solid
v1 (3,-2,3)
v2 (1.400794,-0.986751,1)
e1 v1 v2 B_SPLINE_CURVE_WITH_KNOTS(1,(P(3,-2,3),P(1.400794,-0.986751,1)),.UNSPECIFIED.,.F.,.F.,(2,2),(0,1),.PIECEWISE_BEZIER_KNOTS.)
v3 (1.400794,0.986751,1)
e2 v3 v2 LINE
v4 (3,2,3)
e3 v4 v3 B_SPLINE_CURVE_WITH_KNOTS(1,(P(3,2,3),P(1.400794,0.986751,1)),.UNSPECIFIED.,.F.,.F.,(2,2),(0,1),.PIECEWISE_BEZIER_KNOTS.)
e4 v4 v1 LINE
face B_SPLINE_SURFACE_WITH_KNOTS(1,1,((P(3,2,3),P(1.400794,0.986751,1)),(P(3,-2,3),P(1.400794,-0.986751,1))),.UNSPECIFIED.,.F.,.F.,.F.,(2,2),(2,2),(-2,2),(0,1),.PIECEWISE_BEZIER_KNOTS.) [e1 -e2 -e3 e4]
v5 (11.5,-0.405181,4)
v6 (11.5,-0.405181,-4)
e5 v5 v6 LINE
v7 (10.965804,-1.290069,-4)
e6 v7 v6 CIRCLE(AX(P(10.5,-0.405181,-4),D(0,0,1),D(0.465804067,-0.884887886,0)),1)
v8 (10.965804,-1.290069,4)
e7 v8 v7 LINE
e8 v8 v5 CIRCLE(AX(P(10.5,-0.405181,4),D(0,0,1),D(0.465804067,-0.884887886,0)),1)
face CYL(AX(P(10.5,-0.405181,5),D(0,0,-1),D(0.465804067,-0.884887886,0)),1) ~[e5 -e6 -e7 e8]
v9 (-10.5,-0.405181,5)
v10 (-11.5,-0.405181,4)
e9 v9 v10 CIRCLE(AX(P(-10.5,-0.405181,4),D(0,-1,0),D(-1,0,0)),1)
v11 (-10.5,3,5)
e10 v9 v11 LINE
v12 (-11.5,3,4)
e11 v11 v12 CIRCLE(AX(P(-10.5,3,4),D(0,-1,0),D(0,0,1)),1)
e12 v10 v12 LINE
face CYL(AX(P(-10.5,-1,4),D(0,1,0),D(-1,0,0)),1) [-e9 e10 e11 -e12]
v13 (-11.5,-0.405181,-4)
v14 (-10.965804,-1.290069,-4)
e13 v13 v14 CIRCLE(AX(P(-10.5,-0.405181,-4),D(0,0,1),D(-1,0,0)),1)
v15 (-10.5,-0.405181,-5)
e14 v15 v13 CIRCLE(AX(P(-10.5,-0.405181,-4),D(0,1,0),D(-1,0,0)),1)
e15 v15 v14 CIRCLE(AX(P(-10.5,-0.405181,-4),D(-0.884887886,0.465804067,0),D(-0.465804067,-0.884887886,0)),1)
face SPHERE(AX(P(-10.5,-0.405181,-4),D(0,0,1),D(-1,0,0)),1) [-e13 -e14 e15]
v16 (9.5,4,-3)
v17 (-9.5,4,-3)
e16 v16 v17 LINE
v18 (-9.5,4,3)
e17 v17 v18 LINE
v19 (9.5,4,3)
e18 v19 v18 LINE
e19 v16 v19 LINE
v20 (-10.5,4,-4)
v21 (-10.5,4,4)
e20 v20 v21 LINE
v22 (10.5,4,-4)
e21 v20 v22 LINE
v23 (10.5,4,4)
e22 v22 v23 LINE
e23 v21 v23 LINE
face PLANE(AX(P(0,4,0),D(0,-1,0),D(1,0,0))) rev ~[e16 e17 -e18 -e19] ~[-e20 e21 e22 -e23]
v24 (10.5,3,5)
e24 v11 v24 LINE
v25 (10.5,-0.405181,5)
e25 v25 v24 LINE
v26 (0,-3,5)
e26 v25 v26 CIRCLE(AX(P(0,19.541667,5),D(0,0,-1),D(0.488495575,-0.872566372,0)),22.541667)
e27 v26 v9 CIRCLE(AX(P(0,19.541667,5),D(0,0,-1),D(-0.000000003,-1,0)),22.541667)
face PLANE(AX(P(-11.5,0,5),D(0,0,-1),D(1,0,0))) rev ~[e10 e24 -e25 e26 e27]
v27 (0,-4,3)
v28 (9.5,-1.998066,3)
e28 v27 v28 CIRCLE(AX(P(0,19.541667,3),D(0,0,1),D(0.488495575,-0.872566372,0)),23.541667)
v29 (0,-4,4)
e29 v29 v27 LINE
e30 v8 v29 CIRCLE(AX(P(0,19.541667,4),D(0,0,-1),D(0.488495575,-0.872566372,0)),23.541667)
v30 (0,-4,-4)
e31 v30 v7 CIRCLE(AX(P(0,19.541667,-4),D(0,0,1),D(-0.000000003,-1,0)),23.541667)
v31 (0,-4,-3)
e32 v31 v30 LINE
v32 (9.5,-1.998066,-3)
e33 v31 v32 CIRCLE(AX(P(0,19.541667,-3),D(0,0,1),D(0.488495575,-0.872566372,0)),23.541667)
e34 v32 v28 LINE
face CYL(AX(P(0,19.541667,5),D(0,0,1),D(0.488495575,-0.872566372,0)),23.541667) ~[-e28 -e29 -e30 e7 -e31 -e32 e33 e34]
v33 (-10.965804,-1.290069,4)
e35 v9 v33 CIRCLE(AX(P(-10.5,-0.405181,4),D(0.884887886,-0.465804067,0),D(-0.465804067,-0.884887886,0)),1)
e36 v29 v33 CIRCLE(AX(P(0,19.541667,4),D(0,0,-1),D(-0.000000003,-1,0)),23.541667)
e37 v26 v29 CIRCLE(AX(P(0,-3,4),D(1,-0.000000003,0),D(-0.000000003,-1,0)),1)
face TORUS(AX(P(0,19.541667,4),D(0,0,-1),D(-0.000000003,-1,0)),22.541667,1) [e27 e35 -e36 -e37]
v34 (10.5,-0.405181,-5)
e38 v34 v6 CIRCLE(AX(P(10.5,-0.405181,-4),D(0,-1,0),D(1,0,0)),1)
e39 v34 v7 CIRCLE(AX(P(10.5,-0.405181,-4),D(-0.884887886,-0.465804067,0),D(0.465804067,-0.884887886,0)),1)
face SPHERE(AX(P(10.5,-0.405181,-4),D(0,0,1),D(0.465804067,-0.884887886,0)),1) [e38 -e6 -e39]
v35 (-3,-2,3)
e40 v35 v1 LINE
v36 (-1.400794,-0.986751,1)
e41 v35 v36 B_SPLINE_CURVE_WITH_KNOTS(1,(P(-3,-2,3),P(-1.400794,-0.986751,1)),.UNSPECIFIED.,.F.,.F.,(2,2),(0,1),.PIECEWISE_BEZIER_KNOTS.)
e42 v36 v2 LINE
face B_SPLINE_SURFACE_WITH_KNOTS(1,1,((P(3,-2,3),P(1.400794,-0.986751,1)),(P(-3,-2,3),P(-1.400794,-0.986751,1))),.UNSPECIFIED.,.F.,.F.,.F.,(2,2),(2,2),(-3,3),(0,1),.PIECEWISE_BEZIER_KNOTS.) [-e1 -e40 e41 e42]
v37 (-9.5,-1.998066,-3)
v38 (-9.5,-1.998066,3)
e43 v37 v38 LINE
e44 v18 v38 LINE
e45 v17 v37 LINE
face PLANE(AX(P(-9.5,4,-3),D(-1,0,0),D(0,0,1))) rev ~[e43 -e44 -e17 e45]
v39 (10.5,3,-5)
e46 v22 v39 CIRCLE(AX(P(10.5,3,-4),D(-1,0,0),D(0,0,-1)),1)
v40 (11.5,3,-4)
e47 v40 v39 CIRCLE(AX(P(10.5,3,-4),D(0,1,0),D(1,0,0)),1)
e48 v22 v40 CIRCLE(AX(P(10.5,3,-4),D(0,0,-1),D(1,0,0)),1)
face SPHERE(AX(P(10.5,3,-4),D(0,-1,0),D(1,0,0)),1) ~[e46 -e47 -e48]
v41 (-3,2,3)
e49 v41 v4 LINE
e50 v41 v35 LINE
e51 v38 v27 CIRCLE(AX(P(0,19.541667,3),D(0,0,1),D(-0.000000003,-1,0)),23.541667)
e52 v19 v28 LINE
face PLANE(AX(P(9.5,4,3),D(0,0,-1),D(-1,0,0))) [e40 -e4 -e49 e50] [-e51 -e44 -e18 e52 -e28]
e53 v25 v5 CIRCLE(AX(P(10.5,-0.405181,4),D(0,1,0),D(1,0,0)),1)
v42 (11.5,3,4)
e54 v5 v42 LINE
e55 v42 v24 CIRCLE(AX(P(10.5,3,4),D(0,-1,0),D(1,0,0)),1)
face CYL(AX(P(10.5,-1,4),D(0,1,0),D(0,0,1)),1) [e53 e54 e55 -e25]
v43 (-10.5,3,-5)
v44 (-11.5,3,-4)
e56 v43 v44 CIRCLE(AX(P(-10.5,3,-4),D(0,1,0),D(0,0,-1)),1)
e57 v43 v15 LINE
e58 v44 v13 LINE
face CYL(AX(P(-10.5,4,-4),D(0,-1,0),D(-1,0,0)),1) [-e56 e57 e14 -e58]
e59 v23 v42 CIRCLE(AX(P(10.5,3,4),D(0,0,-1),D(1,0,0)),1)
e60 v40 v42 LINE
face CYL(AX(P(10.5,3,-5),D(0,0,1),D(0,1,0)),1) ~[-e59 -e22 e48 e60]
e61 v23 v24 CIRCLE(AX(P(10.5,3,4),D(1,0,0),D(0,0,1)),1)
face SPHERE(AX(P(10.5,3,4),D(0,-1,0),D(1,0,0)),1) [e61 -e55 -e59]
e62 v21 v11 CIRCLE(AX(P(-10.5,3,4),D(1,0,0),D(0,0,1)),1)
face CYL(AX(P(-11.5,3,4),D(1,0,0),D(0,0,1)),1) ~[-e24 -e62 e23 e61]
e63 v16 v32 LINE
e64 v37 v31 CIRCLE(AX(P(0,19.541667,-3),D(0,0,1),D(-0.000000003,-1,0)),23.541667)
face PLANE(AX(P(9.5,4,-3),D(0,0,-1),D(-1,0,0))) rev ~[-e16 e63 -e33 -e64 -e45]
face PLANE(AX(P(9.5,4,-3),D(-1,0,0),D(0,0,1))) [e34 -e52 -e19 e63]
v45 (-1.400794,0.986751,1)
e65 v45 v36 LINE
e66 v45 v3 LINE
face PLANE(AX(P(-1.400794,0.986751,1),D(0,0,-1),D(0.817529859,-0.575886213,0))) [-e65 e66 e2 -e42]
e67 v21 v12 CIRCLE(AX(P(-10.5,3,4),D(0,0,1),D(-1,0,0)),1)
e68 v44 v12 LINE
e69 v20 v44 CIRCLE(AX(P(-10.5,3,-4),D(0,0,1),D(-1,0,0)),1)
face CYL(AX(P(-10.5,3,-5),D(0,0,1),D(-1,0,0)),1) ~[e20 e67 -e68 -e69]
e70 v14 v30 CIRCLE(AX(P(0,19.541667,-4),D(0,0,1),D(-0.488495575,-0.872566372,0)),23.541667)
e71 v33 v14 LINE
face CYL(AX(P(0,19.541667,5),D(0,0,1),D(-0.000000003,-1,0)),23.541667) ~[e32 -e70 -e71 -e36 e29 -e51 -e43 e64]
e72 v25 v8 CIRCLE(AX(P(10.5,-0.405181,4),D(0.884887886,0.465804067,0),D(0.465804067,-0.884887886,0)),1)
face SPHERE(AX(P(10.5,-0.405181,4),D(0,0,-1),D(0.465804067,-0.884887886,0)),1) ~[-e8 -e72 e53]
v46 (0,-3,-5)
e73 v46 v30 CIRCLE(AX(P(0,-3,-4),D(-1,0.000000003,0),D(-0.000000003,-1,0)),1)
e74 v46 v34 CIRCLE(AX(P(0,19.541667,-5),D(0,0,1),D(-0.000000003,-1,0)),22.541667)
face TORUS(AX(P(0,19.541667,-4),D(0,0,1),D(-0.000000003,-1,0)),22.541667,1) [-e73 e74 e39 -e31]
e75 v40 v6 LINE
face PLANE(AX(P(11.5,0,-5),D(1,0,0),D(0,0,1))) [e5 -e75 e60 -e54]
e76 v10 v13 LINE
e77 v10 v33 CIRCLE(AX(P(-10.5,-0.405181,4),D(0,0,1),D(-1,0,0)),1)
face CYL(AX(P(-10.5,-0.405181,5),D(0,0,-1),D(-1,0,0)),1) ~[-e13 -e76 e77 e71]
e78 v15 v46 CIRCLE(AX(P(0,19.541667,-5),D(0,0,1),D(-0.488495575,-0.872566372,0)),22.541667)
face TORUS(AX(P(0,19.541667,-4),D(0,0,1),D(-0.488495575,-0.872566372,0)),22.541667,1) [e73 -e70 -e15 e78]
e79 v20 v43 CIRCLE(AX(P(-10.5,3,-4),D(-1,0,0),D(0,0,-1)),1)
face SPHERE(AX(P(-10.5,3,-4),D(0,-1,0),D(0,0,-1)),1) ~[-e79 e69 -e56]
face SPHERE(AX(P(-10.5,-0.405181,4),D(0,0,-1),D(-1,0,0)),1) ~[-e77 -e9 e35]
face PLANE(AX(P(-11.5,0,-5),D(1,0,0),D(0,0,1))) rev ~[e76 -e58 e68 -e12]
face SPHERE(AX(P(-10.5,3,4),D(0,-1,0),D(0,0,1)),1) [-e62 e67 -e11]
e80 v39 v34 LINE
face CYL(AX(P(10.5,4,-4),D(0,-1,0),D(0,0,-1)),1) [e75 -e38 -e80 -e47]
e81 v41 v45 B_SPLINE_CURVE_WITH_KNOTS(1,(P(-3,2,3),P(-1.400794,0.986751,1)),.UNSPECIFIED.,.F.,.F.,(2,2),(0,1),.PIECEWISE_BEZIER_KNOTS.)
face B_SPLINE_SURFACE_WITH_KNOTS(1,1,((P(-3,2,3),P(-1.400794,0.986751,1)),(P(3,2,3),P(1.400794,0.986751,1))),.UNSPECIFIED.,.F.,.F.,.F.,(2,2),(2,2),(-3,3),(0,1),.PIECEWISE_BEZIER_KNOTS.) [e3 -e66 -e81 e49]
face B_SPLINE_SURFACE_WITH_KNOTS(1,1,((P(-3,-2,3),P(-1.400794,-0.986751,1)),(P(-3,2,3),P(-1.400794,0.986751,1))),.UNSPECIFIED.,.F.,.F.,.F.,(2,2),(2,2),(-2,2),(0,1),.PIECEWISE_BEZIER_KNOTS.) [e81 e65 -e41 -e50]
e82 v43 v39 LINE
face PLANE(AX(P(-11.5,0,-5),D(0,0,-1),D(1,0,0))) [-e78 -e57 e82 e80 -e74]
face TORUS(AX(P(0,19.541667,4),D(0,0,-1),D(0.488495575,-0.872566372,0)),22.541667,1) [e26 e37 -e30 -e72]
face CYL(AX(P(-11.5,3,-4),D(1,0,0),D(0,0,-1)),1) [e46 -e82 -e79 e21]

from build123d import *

# Parameters (mm, degrees)
F0_W     = 23
F0_H     = 10
F1_DEPTH = 4
F3_DEPTH = 10.001
F4_W     = 19
F4_H     = 6
F5_DEPTH = 8.001
F6_W     = 6
F6_H     = 4
F8_W     = 2.8015887365
F8_H     = 1.9735014066
F11_R    = 1


# Not quite as in the source:
# - a feature of the source that left no trace in its solid (it failed there, or was rolled back) is left out


with BuildPart() as f1:
    # F0 (on Front) → F1 (new body, symmetric)
    with BuildSketch(Plane.XZ):
        Rectangle(F0_W, F0_H)
    extrude(amount=F1_DEPTH, both=True)

    # F2 (on face) → F3 (cut, through all)
    with BuildSketch(Plane.XY.offset(5)):
        with BuildLine():
            ThreePointArc((-6.62e-08, -4), (-5.9424321941, -3.2376566126), (-11.5, -1))
            Line((-11.5, -1), (-11.5, -4))
            Line((-11.5, -4), (-6.62e-08, -4))
        make_face()
        with BuildLine():
            ThreePointArc((11.5, -1), (5.94243213, -3.2376566294), (-6.62e-08, -4))
            Line((-6.62e-08, -4), (11.5, -4))
            Line((11.5, -4), (11.5, -1))
        make_face()
    extrude(amount=-F3_DEPTH, mode=Mode.SUBTRACT)

    # F4 (on face) → F5 (cut, through all)
    with BuildSketch(Plane(origin=(0, 4, 0), x_dir=(-1, 0, 0), z_dir=(0, 1, 0))):
        Rectangle(F4_W, F4_H)
    extrude(amount=-F5_DEPTH, mode=Mode.SUBTRACT)

    # F6 (on face) → F9 section 0
    with BuildSketch(Plane(origin=(0, 0, 3), x_dir=(1, 0, 0), z_dir=(0, 0, -1))):
        Rectangle(F6_W, F6_H)
    # F8 (on offset) → F9 section 1
    with BuildSketch(Plane(origin=(0, 0, 1), x_dir=(1, 0, 0), z_dir=(0, 0, -1))):
        Rectangle(F8_W, F8_H)
    loft()

    # F11
    f11_edges = [f1.edges().sort_by_distance(p)[0] for p in [
        (11.5, 1.5, -5),
        (-11.5, 1.5, -5),
        (11.5, 1.5, 5),
        (-11.5, 1.5, 5),
        (11.5, -1, 0),
        (11.5, 4, 0),
        (0, 4, -5),
        (0, -4, -5),
        (0, -4, 5),
        (-11.5, -1, 0),
        (0, 4, 5),
        (-11.5, 4, 0),
    ]]
    fillet(f11_edges, radius=F11_R)


solid = f1.part
